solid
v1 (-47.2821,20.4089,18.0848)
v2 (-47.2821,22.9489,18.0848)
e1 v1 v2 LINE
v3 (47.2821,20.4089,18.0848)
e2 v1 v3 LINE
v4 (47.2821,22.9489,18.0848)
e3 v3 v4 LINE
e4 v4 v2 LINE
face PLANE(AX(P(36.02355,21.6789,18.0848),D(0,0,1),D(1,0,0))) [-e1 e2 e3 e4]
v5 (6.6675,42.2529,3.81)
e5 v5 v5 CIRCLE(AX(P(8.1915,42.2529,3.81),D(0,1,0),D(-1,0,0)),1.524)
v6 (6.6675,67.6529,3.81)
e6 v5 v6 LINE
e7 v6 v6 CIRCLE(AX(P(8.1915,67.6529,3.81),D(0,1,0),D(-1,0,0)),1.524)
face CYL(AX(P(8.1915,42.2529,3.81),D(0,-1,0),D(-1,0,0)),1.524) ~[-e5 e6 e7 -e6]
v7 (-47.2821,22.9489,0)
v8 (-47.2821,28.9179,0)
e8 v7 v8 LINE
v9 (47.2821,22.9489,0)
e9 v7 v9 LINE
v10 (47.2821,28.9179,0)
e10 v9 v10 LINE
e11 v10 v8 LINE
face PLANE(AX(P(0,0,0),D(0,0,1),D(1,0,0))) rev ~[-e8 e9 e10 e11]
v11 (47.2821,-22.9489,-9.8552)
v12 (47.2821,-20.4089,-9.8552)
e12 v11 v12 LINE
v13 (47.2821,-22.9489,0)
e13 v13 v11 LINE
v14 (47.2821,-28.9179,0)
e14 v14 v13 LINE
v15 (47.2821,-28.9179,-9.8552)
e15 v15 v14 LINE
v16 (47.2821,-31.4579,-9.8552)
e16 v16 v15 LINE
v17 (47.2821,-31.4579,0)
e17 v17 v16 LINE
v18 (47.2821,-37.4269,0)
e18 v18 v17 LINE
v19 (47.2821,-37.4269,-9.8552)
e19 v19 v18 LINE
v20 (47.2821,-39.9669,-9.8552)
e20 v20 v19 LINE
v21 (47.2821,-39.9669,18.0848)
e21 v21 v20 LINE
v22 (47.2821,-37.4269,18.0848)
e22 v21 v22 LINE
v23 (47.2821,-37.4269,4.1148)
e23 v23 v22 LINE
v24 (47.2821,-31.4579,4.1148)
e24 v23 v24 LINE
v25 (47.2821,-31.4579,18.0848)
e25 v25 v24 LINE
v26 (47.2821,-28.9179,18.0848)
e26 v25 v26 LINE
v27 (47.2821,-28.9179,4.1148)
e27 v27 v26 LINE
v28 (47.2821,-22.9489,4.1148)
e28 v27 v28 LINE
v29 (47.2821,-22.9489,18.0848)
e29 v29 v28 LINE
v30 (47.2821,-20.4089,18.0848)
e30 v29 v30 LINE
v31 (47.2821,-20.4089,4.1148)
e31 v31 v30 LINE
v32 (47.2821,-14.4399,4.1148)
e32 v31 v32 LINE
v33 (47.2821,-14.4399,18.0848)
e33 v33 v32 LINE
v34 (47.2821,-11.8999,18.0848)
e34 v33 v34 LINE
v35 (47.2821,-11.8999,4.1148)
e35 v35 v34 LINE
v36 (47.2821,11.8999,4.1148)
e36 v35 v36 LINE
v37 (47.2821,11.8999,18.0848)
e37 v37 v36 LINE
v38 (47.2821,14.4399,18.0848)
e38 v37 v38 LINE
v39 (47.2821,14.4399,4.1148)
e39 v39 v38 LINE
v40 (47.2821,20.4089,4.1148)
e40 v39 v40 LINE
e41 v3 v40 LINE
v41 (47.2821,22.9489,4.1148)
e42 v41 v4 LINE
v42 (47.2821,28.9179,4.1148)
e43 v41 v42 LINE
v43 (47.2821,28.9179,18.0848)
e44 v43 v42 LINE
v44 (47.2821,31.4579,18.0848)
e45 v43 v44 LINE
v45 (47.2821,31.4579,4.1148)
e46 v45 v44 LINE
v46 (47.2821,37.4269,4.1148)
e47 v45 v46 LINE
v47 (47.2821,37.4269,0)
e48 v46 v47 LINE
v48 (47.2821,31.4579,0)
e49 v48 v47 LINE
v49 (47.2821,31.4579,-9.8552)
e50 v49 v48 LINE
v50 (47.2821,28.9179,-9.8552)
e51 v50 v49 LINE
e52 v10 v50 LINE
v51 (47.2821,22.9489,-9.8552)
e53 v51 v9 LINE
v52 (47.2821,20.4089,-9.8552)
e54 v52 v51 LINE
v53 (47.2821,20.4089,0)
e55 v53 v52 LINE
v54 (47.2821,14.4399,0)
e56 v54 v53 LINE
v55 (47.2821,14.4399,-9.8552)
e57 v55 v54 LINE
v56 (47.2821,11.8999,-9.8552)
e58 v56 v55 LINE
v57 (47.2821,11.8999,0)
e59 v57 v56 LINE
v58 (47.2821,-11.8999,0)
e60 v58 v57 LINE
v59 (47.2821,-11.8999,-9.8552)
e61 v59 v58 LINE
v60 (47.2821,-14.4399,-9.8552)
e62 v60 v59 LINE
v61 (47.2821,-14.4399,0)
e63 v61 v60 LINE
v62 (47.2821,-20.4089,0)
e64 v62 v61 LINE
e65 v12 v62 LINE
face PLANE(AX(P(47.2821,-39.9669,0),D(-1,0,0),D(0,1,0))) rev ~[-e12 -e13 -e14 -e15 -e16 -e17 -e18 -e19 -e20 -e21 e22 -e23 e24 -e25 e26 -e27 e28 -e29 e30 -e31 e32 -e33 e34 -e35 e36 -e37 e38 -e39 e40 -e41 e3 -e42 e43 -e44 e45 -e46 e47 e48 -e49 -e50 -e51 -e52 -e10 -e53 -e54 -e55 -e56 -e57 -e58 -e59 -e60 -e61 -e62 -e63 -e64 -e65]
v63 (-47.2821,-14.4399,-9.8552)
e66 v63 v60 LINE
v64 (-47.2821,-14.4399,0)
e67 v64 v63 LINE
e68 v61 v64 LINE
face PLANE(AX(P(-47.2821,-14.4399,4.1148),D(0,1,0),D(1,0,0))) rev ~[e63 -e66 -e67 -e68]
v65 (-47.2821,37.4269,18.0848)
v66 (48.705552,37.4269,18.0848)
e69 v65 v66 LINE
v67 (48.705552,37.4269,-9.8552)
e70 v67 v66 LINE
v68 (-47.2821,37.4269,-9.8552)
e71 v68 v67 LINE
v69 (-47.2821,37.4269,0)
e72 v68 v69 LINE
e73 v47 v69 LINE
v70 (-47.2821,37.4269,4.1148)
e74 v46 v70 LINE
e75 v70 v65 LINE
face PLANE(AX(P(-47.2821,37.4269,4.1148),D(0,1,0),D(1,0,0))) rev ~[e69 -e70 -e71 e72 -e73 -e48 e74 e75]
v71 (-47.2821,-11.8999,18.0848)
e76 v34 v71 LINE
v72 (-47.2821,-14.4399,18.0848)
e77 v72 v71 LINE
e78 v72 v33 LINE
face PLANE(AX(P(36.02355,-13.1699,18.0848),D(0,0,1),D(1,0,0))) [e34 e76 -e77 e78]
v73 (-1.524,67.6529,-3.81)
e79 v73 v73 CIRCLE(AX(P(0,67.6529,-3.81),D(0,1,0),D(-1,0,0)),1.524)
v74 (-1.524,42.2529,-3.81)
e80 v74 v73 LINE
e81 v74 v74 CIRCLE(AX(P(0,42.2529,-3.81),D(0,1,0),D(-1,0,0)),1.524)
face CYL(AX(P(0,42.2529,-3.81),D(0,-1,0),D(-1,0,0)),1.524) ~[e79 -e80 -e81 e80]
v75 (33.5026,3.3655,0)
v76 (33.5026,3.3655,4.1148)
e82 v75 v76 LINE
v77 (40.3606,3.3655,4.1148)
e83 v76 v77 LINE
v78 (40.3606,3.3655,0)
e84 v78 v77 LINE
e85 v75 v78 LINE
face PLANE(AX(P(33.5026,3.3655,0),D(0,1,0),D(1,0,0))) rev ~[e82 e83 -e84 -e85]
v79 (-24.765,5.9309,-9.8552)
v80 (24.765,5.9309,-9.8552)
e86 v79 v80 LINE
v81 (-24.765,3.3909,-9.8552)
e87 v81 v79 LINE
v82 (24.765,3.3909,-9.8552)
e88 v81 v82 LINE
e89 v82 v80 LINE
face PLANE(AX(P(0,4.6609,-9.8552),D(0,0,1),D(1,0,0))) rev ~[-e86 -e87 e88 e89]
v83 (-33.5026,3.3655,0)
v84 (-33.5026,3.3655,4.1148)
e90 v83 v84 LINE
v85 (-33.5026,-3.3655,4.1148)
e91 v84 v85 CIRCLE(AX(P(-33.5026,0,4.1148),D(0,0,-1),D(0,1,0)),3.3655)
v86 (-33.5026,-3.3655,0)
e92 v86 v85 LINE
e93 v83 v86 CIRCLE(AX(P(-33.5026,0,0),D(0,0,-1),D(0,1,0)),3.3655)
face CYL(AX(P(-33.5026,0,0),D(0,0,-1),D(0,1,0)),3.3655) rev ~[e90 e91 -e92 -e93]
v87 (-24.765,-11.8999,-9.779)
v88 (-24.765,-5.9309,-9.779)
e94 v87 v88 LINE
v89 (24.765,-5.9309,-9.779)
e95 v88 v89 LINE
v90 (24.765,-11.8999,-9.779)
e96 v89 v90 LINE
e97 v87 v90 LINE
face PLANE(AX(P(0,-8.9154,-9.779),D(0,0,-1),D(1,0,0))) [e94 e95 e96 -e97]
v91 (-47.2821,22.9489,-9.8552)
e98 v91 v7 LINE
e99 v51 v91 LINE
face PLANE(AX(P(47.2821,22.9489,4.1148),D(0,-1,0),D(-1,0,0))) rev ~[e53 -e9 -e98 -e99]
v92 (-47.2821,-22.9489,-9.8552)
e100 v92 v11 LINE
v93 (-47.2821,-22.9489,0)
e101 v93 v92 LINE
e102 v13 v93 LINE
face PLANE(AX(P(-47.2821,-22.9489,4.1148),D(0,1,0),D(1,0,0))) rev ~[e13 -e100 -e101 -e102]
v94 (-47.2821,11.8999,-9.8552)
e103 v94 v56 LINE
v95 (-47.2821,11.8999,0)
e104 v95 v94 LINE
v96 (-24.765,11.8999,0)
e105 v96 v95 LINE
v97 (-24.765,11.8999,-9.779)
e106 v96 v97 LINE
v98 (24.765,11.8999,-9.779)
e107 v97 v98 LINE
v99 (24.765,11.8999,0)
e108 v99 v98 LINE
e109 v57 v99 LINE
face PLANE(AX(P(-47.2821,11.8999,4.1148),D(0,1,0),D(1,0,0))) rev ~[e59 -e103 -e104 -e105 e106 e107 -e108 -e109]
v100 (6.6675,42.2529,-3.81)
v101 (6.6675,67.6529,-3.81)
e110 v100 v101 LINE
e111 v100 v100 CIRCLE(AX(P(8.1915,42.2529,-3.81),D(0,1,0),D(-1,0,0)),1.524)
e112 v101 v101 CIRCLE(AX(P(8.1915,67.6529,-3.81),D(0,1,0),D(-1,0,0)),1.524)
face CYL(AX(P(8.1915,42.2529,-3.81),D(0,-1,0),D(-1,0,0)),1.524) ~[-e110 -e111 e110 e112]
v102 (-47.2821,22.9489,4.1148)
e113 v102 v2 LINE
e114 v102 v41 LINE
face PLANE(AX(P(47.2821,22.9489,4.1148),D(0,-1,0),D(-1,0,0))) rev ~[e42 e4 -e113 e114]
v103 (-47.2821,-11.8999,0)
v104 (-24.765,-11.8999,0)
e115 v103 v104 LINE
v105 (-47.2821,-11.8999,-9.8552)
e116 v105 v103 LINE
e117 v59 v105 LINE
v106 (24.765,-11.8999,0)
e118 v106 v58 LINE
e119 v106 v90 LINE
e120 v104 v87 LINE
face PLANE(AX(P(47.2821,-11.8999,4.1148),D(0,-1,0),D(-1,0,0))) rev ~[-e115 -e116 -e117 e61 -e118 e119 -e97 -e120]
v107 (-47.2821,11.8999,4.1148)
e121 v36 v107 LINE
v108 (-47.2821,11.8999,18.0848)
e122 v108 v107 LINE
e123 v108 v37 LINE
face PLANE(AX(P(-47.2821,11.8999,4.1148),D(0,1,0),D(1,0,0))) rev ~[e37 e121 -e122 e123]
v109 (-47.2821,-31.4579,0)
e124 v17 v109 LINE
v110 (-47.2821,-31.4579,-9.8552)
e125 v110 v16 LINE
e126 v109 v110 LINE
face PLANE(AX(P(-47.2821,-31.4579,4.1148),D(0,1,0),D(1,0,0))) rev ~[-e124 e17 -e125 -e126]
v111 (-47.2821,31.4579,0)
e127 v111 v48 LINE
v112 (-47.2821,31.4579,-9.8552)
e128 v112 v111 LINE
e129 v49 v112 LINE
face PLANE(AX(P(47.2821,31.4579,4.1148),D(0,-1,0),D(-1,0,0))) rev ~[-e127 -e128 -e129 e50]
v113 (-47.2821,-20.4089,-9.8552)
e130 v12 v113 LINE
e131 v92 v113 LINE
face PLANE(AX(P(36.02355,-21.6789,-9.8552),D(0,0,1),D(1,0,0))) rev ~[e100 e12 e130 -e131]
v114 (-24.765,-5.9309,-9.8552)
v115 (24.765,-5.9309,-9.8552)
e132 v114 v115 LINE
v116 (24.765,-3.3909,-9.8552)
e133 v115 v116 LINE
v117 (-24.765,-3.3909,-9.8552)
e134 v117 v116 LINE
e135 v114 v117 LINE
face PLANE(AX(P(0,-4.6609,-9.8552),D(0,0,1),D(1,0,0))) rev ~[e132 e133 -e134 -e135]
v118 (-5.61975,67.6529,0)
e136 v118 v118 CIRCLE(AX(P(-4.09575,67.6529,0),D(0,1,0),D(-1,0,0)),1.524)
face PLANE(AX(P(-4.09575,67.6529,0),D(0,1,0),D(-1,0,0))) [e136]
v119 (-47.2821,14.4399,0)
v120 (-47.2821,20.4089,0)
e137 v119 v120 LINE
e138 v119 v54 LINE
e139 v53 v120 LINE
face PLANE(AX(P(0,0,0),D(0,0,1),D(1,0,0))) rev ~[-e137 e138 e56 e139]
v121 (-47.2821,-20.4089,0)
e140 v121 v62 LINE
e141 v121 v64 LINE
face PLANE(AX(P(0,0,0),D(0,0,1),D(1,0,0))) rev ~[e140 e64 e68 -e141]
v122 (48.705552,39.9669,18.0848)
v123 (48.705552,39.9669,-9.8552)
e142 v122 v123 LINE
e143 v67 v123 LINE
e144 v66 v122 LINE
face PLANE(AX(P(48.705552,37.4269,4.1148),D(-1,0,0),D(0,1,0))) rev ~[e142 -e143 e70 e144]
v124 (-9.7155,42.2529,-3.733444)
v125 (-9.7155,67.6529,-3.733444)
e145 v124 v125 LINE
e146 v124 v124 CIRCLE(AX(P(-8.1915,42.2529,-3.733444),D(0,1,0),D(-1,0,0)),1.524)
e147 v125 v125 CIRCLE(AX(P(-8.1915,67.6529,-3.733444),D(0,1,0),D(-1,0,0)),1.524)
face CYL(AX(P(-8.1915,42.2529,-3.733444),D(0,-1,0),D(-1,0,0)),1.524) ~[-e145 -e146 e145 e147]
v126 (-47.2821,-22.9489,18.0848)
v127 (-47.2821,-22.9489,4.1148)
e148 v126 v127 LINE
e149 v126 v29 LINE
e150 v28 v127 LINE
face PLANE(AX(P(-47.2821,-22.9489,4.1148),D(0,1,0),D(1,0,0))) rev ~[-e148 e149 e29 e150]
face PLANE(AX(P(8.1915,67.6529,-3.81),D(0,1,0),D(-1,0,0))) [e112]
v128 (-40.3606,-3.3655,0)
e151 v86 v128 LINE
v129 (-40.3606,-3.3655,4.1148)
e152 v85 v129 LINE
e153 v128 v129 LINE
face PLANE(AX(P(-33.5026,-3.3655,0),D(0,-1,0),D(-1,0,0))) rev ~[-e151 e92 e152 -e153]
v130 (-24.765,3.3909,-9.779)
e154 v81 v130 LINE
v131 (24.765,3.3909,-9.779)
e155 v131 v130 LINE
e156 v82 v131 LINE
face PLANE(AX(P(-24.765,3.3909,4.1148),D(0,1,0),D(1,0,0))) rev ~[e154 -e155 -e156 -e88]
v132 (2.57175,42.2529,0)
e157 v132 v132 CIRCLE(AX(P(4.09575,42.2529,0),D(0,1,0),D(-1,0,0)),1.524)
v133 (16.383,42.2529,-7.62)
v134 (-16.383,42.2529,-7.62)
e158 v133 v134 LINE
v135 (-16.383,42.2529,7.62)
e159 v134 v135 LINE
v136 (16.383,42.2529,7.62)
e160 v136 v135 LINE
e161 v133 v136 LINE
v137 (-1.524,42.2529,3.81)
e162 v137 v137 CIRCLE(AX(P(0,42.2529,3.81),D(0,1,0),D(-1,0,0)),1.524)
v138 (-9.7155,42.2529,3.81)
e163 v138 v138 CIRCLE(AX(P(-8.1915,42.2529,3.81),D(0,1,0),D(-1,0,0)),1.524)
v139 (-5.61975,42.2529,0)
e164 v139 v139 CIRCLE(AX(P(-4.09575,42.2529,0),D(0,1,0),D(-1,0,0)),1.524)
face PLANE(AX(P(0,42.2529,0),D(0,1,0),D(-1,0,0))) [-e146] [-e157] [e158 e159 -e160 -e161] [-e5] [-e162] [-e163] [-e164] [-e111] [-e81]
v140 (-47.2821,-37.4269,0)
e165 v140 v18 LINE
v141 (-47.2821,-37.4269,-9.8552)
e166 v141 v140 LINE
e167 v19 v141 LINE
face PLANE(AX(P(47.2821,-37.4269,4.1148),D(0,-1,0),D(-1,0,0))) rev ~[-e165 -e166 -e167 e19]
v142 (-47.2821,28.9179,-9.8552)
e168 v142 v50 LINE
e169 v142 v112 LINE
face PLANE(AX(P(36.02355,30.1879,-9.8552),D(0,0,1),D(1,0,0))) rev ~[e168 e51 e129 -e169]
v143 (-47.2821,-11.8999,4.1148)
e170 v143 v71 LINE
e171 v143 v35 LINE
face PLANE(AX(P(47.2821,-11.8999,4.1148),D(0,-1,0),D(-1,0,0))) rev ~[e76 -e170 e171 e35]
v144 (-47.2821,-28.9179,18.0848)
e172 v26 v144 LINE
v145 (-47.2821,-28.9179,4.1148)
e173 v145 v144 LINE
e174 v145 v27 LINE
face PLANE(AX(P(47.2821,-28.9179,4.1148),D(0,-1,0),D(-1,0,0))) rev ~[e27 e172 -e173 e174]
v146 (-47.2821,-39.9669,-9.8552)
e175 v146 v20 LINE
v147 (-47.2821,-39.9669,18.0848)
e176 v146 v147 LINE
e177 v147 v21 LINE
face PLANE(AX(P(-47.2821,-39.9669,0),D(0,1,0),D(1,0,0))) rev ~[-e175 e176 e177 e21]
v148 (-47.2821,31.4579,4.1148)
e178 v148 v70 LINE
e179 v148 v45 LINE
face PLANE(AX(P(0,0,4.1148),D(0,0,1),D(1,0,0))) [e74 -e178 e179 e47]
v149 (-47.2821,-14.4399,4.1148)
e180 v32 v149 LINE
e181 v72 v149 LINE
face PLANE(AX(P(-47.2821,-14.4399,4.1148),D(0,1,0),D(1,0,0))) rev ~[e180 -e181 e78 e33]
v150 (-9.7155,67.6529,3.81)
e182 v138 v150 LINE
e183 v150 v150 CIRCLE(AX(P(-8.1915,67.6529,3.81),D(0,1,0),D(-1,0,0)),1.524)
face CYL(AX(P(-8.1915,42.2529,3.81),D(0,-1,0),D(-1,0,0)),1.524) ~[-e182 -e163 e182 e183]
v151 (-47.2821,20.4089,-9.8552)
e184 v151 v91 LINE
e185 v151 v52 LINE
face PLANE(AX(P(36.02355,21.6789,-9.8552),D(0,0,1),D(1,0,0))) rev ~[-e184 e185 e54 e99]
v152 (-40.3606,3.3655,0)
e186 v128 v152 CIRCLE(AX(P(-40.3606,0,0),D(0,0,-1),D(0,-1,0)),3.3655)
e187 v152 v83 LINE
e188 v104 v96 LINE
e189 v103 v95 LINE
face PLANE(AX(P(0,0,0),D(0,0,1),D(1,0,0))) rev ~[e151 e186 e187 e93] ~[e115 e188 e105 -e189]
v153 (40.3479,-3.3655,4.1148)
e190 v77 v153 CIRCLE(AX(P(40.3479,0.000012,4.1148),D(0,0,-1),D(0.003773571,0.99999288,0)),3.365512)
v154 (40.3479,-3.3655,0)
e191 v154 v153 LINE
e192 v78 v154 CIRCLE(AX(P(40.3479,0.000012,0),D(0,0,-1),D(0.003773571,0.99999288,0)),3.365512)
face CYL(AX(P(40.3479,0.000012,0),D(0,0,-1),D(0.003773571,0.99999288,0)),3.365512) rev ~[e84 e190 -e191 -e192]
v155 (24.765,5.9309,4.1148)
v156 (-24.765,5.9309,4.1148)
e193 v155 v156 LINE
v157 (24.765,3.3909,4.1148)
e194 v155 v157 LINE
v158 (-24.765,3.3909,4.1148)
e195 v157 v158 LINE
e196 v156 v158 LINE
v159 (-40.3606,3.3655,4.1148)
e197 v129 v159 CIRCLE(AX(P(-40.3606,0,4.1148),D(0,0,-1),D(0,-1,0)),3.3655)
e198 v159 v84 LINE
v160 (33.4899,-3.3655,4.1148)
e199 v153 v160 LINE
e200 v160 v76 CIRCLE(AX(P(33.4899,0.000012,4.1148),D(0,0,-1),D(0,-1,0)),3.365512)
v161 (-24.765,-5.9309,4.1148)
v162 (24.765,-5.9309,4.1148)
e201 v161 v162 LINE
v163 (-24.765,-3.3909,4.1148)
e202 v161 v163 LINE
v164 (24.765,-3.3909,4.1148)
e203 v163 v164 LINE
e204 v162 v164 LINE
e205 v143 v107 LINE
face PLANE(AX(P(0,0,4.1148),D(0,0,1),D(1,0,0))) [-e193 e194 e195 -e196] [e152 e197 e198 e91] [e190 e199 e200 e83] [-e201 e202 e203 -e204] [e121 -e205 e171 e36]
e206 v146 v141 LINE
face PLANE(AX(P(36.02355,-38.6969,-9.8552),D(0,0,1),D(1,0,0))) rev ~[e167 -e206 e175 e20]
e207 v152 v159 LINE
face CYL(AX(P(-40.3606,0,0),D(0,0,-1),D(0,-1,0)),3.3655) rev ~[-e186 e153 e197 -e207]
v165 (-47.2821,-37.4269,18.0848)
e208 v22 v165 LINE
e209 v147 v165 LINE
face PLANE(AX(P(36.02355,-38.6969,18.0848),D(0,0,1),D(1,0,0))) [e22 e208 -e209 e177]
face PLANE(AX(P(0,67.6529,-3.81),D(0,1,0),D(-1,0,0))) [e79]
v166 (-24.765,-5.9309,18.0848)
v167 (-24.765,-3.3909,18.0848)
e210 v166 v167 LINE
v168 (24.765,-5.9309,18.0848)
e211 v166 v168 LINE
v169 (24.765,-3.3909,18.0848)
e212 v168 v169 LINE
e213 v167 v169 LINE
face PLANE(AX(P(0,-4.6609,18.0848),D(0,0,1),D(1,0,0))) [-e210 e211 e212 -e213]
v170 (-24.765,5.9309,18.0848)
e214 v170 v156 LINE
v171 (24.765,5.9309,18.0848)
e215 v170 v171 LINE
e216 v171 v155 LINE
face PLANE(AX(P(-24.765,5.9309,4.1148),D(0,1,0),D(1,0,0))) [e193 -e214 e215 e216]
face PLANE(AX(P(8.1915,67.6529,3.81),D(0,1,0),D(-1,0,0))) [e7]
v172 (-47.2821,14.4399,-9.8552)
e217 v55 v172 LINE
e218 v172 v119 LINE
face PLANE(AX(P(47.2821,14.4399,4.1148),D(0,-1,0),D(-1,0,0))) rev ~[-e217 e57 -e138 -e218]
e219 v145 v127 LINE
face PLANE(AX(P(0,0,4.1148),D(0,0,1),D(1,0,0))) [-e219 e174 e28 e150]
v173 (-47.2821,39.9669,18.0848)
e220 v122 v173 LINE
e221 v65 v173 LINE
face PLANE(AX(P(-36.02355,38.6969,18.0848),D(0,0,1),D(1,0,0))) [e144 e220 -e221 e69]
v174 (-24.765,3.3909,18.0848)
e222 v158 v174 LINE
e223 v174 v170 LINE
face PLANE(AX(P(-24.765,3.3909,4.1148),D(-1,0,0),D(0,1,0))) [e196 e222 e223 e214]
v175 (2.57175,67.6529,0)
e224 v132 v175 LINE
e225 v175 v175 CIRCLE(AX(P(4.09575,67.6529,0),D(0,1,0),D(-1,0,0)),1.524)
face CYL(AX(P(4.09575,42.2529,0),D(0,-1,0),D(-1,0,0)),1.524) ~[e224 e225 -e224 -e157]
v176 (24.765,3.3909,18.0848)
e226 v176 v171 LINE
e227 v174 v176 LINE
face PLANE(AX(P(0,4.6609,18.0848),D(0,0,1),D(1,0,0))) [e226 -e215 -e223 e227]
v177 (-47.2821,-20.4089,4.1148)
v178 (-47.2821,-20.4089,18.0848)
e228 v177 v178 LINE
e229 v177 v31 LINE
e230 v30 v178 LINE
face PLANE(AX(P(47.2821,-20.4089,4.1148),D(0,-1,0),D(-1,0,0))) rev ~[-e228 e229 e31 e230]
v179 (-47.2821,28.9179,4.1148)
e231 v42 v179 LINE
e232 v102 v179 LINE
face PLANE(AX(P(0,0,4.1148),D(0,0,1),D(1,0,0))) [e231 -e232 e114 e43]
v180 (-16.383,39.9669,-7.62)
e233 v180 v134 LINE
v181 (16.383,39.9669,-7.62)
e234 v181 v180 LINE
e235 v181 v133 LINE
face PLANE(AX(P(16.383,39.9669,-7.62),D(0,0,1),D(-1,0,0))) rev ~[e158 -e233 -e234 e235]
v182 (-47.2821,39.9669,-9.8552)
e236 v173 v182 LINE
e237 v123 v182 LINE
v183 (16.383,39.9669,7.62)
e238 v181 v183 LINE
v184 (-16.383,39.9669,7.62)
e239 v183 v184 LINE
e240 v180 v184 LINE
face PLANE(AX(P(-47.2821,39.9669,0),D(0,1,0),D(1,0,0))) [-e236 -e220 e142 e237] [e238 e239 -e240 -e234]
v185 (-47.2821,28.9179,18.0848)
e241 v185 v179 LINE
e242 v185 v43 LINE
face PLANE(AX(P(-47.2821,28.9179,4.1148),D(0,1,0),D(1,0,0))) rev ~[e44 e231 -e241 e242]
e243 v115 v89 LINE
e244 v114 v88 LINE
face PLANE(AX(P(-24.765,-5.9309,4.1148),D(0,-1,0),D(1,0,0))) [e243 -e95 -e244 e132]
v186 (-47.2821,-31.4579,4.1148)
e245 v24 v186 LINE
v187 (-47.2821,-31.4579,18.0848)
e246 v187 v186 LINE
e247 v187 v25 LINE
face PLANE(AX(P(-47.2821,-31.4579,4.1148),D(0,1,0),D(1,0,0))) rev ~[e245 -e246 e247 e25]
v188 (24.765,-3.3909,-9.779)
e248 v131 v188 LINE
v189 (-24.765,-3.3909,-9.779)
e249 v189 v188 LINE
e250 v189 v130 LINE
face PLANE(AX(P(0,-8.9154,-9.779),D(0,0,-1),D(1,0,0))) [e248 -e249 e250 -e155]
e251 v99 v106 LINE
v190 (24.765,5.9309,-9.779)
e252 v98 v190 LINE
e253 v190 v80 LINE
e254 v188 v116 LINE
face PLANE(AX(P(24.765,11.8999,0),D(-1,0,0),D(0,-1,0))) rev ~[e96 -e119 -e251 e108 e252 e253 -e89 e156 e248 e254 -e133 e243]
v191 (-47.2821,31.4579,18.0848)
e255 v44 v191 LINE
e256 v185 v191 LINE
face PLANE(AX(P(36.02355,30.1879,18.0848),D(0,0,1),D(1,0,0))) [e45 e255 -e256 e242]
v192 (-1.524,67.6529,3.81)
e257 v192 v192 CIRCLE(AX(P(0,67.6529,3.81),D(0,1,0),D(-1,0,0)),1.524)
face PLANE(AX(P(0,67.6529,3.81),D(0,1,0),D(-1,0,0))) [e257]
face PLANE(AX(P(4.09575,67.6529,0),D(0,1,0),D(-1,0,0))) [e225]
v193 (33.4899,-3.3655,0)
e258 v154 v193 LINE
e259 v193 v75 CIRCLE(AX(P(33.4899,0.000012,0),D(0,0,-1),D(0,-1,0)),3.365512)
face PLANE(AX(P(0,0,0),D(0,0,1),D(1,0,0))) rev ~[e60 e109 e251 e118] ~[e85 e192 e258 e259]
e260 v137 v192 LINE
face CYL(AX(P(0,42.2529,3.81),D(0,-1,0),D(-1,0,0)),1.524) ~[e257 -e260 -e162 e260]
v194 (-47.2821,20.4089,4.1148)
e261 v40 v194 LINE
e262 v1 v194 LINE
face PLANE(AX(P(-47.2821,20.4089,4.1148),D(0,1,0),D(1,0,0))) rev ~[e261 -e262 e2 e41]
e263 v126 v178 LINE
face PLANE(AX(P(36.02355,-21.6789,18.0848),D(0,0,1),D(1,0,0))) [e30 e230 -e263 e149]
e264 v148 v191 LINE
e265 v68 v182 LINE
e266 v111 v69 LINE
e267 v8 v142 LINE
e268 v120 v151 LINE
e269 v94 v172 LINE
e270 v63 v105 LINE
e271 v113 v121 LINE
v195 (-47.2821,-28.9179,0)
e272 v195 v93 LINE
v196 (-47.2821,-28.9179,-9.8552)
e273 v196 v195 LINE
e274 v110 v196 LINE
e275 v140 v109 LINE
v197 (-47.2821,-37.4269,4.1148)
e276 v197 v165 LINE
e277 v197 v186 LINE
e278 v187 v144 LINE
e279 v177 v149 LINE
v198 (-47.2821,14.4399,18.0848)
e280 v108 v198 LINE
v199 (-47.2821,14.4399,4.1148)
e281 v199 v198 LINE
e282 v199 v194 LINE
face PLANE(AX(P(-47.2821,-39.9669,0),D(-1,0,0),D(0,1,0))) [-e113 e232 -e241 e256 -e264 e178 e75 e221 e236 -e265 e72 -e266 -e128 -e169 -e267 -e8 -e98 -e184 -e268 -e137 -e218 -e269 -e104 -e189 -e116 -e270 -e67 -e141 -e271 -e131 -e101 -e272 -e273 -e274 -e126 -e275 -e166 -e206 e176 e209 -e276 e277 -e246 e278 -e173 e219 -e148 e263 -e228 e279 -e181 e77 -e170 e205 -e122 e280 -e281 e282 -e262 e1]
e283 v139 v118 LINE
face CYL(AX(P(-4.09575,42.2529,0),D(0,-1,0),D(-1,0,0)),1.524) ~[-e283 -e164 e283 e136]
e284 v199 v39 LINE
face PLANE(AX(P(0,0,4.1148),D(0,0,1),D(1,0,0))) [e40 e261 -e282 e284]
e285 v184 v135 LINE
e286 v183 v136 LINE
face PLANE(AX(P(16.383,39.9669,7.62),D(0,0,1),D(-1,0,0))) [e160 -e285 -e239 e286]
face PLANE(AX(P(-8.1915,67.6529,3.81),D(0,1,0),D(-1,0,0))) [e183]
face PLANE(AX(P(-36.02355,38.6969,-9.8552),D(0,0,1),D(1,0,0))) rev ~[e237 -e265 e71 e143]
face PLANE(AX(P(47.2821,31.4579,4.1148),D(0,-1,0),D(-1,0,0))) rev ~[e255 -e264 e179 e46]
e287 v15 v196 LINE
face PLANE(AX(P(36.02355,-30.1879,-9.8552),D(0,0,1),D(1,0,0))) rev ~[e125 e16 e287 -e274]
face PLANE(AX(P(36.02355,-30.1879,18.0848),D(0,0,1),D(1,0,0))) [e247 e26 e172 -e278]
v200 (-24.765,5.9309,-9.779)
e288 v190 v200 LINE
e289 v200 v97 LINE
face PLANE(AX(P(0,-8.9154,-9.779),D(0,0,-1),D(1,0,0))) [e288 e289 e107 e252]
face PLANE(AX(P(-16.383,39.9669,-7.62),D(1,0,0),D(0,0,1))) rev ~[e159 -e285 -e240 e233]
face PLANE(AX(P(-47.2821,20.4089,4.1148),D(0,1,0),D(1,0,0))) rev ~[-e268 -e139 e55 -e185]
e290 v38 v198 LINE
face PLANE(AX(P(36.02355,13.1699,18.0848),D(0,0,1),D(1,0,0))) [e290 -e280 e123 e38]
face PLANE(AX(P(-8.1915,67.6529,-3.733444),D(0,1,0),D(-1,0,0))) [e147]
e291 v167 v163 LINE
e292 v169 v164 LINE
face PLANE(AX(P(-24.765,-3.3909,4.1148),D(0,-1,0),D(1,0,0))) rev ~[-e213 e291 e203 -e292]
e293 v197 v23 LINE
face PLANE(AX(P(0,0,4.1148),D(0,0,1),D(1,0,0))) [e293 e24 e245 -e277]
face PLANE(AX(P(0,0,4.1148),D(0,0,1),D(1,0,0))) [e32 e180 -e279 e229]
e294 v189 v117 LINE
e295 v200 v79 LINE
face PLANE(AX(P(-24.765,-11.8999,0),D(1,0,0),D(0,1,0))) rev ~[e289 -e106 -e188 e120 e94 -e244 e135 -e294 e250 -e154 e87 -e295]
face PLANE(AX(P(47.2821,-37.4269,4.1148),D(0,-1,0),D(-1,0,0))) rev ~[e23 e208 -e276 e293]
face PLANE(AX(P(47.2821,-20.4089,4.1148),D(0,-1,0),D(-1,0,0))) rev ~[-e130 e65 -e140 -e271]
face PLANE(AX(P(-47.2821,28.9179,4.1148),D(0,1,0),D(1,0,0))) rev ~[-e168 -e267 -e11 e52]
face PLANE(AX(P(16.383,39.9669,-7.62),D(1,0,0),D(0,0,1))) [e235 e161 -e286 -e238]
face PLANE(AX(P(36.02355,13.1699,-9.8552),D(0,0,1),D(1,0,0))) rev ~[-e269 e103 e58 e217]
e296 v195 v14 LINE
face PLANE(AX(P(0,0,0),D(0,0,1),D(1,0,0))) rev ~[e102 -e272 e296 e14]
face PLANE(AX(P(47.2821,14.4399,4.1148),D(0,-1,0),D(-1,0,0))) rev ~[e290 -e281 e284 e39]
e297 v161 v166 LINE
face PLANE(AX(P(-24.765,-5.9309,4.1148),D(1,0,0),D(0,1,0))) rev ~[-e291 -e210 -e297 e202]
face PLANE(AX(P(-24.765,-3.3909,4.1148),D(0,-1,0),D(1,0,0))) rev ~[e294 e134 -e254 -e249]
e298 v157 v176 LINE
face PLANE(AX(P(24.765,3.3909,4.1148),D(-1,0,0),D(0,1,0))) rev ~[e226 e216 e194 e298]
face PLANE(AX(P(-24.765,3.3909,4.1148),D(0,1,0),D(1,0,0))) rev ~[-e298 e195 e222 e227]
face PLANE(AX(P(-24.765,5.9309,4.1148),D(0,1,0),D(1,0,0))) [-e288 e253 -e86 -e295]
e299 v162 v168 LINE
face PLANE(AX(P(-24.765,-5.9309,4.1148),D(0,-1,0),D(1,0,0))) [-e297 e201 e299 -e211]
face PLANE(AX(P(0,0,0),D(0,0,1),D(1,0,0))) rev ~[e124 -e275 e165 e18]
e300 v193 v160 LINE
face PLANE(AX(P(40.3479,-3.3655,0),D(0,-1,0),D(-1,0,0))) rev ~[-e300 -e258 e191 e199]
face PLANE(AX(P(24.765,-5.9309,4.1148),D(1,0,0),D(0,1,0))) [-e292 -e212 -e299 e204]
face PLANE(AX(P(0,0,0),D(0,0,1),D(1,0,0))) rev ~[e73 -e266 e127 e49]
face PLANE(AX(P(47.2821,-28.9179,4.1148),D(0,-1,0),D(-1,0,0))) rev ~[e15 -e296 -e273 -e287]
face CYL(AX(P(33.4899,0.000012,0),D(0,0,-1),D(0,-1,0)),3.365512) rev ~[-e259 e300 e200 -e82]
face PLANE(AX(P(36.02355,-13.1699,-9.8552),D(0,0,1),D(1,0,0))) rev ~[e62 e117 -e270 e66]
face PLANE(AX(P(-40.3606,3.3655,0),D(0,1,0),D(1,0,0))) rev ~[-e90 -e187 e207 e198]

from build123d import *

# Parameters (mm, degrees)
F0_W     = 94.5642
F0_H     = 79.9338
F1_DEPTH = 4.1148
F2_W     = 22.5171
F2_H     = 2.54
F2_W_2   = 49.53
F2_W_3   = 1.4234517733
F3_DEPTH = 13.97
F4_W     = 32.766
F4_H     = 15.24
F5_DEPTH = 2.286
F7_W     = 49.53
F7_H     = 5.969
F7_H_2   = 2.54
F7_H_3   = 6.7818
F8_DEPTH = 9.779
F6_R     = 1.524
F9_DEPTH = 25.4


with BuildPart() as f1:
    # F0 (on Top) → F1 (new body)
    with BuildSketch(Plane.XY):
        Rectangle(F0_W, F0_H)
        with BuildLine():
            Line((-40.3606, 3.3655), (-33.5026, 3.3655))
            ThreePointArc((-33.5026, 3.3655), (-30.1371, 0), (-33.5026, -3.3655))
            Line((-33.5026, -3.3655), (-40.3606, -3.3655))
            ThreePointArc((-40.3606, -3.3655), (-43.7261, 0), (-40.3606, 3.3655))
        make_face(mode=Mode.SUBTRACT)
        with BuildLine():
            Line((33.5026, 3.3655), (40.3606, 3.3655))
            ThreePointArc((40.3606, 3.3655), (43.7134059906, -0.0063380302), (40.3479, -3.3655))
            Line((40.3479, -3.3655), (33.4899, -3.3655))
            ThreePointArc((33.4899, -3.3655), (30.1243940094, 0.0063619924), (33.5026, 3.3655))
        make_face(mode=Mode.SUBTRACT)
    extrude(amount=F1_DEPTH)

    # F2 (on face) → F3 (join, symmetric)
    with BuildSketch(Plane.XY.offset(4.1148)):
        with Locations((36.02355, -38.6969)):
            Rectangle(F2_W, F2_H)
        with Locations((-36.02355, 38.6969)):
            Rectangle(F2_W, F2_H)
        with Locations((-36.02355, -38.6969)):
            Rectangle(F2_W, F2_H)
        with Locations((0, 38.6969)):
            Rectangle(F2_W_2, F2_H)
        with Locations((36.02355, 30.1879)):
            Rectangle(F2_W, F2_H)
        with Locations((36.02355, 21.6789)):
            Rectangle(F2_W, F2_H)
        with Locations((36.02355, 13.1699)):
            Rectangle(F2_W, F2_H)
        with Locations((36.02355, -13.1699)):
            Rectangle(F2_W, F2_H)
        with Locations((36.02355, -21.6789)):
            Rectangle(F2_W, F2_H)
        with Locations((36.02355, -30.1879)):
            Rectangle(F2_W, F2_H)
        with Locations((0, -38.6969)):
            Rectangle(F2_W_2, F2_H)
        with Locations((-36.02355, 30.1879)):
            Rectangle(F2_W, F2_H)
        with Locations((-36.02355, 21.6789)):
            Rectangle(F2_W, F2_H)
        with Locations((-36.02355, 13.1699)):
            Rectangle(F2_W, F2_H)
        with Locations((-36.02355, -13.1699)):
            Rectangle(F2_W, F2_H)
        with Locations((-36.02355, -21.6789)):
            Rectangle(F2_W, F2_H)
        with Locations((-36.02355, -30.1879)):
            Rectangle(F2_W, F2_H)
        with Locations((0, 30.1879)):
            Rectangle(F2_W_2, F2_H)
        with Locations((0, 21.6789)):
            Rectangle(F2_W_2, F2_H)
        with Locations((0, 13.1699)):
            Rectangle(F2_W_2, F2_H)
        with Locations((0, -13.1699)):
            Rectangle(F2_W_2, F2_H)
        with Locations((0, -21.6789)):
            Rectangle(F2_W_2, F2_H)
        with Locations((0, -30.1879)):
            Rectangle(F2_W_2, F2_H)
        with Locations((0, 4.6609)):
            Rectangle(F2_W_2, F2_H)
        with Locations((0, -4.6609)):
            Rectangle(F2_W_2, F2_H)
        with Locations((47.9938258867, 38.6969)):
            Rectangle(F2_W_3, F2_H)
        with Locations((36.02355, 38.6969)):
            Rectangle(F2_W, F2_H)
    extrude(amount=F3_DEPTH, both=True)

    # F4 (on face) → F5 (join)
    with BuildSketch(Plane(origin=(0, 39.9669, 0), x_dir=(-1, 0, 0), z_dir=(0, 1, 0))):
        Rectangle(F4_W, F4_H)
    extrude(amount=F5_DEPTH)

    # F7 (on face) → F8 (join)
    with BuildSketch(Plane(origin=(0, 0, 0), x_dir=(1, 0, 0), z_dir=(0, 0, -1))):
        with Locations((0, 8.9154)):
            Rectangle(F7_W, F7_H)
        with Locations((0, 4.6609)):
            Rectangle(F7_W, F7_H_2)
        Rectangle(F7_W, F7_H_3)
        with Locations((0, -4.6609)):
            Rectangle(F7_W, F7_H_2)
        with Locations((0, -8.9154)):
            Rectangle(F7_W, F7_H)
    extrude(amount=F8_DEPTH)

    # F6 (on face) → F9 (join)
    with BuildSketch(Plane(origin=(0, 42.2529, 0), x_dir=(-1, 0, 0), z_dir=(0, 1, 0))):
        with Locations((-8.1915, 3.81)):
            Circle(F6_R)
        with Locations((8.1915, 3.81)):
            Circle(F6_R)
        with Locations((4.09575, 0)):
            Circle(F6_R)
        with Locations((-4.09575, 0)):
            Circle(F6_R)
        with Locations((8.1915, -3.7334442604)):
            Circle(F6_R)
        with Locations((-8.1915, -3.81)):
            Circle(F6_R)
        with Locations((0, 3.81)):
            Circle(F6_R)
        with Locations((0, -3.81)):
            Circle(F6_R)
    extrude(amount=F9_DEPTH)


solid = f1.part
